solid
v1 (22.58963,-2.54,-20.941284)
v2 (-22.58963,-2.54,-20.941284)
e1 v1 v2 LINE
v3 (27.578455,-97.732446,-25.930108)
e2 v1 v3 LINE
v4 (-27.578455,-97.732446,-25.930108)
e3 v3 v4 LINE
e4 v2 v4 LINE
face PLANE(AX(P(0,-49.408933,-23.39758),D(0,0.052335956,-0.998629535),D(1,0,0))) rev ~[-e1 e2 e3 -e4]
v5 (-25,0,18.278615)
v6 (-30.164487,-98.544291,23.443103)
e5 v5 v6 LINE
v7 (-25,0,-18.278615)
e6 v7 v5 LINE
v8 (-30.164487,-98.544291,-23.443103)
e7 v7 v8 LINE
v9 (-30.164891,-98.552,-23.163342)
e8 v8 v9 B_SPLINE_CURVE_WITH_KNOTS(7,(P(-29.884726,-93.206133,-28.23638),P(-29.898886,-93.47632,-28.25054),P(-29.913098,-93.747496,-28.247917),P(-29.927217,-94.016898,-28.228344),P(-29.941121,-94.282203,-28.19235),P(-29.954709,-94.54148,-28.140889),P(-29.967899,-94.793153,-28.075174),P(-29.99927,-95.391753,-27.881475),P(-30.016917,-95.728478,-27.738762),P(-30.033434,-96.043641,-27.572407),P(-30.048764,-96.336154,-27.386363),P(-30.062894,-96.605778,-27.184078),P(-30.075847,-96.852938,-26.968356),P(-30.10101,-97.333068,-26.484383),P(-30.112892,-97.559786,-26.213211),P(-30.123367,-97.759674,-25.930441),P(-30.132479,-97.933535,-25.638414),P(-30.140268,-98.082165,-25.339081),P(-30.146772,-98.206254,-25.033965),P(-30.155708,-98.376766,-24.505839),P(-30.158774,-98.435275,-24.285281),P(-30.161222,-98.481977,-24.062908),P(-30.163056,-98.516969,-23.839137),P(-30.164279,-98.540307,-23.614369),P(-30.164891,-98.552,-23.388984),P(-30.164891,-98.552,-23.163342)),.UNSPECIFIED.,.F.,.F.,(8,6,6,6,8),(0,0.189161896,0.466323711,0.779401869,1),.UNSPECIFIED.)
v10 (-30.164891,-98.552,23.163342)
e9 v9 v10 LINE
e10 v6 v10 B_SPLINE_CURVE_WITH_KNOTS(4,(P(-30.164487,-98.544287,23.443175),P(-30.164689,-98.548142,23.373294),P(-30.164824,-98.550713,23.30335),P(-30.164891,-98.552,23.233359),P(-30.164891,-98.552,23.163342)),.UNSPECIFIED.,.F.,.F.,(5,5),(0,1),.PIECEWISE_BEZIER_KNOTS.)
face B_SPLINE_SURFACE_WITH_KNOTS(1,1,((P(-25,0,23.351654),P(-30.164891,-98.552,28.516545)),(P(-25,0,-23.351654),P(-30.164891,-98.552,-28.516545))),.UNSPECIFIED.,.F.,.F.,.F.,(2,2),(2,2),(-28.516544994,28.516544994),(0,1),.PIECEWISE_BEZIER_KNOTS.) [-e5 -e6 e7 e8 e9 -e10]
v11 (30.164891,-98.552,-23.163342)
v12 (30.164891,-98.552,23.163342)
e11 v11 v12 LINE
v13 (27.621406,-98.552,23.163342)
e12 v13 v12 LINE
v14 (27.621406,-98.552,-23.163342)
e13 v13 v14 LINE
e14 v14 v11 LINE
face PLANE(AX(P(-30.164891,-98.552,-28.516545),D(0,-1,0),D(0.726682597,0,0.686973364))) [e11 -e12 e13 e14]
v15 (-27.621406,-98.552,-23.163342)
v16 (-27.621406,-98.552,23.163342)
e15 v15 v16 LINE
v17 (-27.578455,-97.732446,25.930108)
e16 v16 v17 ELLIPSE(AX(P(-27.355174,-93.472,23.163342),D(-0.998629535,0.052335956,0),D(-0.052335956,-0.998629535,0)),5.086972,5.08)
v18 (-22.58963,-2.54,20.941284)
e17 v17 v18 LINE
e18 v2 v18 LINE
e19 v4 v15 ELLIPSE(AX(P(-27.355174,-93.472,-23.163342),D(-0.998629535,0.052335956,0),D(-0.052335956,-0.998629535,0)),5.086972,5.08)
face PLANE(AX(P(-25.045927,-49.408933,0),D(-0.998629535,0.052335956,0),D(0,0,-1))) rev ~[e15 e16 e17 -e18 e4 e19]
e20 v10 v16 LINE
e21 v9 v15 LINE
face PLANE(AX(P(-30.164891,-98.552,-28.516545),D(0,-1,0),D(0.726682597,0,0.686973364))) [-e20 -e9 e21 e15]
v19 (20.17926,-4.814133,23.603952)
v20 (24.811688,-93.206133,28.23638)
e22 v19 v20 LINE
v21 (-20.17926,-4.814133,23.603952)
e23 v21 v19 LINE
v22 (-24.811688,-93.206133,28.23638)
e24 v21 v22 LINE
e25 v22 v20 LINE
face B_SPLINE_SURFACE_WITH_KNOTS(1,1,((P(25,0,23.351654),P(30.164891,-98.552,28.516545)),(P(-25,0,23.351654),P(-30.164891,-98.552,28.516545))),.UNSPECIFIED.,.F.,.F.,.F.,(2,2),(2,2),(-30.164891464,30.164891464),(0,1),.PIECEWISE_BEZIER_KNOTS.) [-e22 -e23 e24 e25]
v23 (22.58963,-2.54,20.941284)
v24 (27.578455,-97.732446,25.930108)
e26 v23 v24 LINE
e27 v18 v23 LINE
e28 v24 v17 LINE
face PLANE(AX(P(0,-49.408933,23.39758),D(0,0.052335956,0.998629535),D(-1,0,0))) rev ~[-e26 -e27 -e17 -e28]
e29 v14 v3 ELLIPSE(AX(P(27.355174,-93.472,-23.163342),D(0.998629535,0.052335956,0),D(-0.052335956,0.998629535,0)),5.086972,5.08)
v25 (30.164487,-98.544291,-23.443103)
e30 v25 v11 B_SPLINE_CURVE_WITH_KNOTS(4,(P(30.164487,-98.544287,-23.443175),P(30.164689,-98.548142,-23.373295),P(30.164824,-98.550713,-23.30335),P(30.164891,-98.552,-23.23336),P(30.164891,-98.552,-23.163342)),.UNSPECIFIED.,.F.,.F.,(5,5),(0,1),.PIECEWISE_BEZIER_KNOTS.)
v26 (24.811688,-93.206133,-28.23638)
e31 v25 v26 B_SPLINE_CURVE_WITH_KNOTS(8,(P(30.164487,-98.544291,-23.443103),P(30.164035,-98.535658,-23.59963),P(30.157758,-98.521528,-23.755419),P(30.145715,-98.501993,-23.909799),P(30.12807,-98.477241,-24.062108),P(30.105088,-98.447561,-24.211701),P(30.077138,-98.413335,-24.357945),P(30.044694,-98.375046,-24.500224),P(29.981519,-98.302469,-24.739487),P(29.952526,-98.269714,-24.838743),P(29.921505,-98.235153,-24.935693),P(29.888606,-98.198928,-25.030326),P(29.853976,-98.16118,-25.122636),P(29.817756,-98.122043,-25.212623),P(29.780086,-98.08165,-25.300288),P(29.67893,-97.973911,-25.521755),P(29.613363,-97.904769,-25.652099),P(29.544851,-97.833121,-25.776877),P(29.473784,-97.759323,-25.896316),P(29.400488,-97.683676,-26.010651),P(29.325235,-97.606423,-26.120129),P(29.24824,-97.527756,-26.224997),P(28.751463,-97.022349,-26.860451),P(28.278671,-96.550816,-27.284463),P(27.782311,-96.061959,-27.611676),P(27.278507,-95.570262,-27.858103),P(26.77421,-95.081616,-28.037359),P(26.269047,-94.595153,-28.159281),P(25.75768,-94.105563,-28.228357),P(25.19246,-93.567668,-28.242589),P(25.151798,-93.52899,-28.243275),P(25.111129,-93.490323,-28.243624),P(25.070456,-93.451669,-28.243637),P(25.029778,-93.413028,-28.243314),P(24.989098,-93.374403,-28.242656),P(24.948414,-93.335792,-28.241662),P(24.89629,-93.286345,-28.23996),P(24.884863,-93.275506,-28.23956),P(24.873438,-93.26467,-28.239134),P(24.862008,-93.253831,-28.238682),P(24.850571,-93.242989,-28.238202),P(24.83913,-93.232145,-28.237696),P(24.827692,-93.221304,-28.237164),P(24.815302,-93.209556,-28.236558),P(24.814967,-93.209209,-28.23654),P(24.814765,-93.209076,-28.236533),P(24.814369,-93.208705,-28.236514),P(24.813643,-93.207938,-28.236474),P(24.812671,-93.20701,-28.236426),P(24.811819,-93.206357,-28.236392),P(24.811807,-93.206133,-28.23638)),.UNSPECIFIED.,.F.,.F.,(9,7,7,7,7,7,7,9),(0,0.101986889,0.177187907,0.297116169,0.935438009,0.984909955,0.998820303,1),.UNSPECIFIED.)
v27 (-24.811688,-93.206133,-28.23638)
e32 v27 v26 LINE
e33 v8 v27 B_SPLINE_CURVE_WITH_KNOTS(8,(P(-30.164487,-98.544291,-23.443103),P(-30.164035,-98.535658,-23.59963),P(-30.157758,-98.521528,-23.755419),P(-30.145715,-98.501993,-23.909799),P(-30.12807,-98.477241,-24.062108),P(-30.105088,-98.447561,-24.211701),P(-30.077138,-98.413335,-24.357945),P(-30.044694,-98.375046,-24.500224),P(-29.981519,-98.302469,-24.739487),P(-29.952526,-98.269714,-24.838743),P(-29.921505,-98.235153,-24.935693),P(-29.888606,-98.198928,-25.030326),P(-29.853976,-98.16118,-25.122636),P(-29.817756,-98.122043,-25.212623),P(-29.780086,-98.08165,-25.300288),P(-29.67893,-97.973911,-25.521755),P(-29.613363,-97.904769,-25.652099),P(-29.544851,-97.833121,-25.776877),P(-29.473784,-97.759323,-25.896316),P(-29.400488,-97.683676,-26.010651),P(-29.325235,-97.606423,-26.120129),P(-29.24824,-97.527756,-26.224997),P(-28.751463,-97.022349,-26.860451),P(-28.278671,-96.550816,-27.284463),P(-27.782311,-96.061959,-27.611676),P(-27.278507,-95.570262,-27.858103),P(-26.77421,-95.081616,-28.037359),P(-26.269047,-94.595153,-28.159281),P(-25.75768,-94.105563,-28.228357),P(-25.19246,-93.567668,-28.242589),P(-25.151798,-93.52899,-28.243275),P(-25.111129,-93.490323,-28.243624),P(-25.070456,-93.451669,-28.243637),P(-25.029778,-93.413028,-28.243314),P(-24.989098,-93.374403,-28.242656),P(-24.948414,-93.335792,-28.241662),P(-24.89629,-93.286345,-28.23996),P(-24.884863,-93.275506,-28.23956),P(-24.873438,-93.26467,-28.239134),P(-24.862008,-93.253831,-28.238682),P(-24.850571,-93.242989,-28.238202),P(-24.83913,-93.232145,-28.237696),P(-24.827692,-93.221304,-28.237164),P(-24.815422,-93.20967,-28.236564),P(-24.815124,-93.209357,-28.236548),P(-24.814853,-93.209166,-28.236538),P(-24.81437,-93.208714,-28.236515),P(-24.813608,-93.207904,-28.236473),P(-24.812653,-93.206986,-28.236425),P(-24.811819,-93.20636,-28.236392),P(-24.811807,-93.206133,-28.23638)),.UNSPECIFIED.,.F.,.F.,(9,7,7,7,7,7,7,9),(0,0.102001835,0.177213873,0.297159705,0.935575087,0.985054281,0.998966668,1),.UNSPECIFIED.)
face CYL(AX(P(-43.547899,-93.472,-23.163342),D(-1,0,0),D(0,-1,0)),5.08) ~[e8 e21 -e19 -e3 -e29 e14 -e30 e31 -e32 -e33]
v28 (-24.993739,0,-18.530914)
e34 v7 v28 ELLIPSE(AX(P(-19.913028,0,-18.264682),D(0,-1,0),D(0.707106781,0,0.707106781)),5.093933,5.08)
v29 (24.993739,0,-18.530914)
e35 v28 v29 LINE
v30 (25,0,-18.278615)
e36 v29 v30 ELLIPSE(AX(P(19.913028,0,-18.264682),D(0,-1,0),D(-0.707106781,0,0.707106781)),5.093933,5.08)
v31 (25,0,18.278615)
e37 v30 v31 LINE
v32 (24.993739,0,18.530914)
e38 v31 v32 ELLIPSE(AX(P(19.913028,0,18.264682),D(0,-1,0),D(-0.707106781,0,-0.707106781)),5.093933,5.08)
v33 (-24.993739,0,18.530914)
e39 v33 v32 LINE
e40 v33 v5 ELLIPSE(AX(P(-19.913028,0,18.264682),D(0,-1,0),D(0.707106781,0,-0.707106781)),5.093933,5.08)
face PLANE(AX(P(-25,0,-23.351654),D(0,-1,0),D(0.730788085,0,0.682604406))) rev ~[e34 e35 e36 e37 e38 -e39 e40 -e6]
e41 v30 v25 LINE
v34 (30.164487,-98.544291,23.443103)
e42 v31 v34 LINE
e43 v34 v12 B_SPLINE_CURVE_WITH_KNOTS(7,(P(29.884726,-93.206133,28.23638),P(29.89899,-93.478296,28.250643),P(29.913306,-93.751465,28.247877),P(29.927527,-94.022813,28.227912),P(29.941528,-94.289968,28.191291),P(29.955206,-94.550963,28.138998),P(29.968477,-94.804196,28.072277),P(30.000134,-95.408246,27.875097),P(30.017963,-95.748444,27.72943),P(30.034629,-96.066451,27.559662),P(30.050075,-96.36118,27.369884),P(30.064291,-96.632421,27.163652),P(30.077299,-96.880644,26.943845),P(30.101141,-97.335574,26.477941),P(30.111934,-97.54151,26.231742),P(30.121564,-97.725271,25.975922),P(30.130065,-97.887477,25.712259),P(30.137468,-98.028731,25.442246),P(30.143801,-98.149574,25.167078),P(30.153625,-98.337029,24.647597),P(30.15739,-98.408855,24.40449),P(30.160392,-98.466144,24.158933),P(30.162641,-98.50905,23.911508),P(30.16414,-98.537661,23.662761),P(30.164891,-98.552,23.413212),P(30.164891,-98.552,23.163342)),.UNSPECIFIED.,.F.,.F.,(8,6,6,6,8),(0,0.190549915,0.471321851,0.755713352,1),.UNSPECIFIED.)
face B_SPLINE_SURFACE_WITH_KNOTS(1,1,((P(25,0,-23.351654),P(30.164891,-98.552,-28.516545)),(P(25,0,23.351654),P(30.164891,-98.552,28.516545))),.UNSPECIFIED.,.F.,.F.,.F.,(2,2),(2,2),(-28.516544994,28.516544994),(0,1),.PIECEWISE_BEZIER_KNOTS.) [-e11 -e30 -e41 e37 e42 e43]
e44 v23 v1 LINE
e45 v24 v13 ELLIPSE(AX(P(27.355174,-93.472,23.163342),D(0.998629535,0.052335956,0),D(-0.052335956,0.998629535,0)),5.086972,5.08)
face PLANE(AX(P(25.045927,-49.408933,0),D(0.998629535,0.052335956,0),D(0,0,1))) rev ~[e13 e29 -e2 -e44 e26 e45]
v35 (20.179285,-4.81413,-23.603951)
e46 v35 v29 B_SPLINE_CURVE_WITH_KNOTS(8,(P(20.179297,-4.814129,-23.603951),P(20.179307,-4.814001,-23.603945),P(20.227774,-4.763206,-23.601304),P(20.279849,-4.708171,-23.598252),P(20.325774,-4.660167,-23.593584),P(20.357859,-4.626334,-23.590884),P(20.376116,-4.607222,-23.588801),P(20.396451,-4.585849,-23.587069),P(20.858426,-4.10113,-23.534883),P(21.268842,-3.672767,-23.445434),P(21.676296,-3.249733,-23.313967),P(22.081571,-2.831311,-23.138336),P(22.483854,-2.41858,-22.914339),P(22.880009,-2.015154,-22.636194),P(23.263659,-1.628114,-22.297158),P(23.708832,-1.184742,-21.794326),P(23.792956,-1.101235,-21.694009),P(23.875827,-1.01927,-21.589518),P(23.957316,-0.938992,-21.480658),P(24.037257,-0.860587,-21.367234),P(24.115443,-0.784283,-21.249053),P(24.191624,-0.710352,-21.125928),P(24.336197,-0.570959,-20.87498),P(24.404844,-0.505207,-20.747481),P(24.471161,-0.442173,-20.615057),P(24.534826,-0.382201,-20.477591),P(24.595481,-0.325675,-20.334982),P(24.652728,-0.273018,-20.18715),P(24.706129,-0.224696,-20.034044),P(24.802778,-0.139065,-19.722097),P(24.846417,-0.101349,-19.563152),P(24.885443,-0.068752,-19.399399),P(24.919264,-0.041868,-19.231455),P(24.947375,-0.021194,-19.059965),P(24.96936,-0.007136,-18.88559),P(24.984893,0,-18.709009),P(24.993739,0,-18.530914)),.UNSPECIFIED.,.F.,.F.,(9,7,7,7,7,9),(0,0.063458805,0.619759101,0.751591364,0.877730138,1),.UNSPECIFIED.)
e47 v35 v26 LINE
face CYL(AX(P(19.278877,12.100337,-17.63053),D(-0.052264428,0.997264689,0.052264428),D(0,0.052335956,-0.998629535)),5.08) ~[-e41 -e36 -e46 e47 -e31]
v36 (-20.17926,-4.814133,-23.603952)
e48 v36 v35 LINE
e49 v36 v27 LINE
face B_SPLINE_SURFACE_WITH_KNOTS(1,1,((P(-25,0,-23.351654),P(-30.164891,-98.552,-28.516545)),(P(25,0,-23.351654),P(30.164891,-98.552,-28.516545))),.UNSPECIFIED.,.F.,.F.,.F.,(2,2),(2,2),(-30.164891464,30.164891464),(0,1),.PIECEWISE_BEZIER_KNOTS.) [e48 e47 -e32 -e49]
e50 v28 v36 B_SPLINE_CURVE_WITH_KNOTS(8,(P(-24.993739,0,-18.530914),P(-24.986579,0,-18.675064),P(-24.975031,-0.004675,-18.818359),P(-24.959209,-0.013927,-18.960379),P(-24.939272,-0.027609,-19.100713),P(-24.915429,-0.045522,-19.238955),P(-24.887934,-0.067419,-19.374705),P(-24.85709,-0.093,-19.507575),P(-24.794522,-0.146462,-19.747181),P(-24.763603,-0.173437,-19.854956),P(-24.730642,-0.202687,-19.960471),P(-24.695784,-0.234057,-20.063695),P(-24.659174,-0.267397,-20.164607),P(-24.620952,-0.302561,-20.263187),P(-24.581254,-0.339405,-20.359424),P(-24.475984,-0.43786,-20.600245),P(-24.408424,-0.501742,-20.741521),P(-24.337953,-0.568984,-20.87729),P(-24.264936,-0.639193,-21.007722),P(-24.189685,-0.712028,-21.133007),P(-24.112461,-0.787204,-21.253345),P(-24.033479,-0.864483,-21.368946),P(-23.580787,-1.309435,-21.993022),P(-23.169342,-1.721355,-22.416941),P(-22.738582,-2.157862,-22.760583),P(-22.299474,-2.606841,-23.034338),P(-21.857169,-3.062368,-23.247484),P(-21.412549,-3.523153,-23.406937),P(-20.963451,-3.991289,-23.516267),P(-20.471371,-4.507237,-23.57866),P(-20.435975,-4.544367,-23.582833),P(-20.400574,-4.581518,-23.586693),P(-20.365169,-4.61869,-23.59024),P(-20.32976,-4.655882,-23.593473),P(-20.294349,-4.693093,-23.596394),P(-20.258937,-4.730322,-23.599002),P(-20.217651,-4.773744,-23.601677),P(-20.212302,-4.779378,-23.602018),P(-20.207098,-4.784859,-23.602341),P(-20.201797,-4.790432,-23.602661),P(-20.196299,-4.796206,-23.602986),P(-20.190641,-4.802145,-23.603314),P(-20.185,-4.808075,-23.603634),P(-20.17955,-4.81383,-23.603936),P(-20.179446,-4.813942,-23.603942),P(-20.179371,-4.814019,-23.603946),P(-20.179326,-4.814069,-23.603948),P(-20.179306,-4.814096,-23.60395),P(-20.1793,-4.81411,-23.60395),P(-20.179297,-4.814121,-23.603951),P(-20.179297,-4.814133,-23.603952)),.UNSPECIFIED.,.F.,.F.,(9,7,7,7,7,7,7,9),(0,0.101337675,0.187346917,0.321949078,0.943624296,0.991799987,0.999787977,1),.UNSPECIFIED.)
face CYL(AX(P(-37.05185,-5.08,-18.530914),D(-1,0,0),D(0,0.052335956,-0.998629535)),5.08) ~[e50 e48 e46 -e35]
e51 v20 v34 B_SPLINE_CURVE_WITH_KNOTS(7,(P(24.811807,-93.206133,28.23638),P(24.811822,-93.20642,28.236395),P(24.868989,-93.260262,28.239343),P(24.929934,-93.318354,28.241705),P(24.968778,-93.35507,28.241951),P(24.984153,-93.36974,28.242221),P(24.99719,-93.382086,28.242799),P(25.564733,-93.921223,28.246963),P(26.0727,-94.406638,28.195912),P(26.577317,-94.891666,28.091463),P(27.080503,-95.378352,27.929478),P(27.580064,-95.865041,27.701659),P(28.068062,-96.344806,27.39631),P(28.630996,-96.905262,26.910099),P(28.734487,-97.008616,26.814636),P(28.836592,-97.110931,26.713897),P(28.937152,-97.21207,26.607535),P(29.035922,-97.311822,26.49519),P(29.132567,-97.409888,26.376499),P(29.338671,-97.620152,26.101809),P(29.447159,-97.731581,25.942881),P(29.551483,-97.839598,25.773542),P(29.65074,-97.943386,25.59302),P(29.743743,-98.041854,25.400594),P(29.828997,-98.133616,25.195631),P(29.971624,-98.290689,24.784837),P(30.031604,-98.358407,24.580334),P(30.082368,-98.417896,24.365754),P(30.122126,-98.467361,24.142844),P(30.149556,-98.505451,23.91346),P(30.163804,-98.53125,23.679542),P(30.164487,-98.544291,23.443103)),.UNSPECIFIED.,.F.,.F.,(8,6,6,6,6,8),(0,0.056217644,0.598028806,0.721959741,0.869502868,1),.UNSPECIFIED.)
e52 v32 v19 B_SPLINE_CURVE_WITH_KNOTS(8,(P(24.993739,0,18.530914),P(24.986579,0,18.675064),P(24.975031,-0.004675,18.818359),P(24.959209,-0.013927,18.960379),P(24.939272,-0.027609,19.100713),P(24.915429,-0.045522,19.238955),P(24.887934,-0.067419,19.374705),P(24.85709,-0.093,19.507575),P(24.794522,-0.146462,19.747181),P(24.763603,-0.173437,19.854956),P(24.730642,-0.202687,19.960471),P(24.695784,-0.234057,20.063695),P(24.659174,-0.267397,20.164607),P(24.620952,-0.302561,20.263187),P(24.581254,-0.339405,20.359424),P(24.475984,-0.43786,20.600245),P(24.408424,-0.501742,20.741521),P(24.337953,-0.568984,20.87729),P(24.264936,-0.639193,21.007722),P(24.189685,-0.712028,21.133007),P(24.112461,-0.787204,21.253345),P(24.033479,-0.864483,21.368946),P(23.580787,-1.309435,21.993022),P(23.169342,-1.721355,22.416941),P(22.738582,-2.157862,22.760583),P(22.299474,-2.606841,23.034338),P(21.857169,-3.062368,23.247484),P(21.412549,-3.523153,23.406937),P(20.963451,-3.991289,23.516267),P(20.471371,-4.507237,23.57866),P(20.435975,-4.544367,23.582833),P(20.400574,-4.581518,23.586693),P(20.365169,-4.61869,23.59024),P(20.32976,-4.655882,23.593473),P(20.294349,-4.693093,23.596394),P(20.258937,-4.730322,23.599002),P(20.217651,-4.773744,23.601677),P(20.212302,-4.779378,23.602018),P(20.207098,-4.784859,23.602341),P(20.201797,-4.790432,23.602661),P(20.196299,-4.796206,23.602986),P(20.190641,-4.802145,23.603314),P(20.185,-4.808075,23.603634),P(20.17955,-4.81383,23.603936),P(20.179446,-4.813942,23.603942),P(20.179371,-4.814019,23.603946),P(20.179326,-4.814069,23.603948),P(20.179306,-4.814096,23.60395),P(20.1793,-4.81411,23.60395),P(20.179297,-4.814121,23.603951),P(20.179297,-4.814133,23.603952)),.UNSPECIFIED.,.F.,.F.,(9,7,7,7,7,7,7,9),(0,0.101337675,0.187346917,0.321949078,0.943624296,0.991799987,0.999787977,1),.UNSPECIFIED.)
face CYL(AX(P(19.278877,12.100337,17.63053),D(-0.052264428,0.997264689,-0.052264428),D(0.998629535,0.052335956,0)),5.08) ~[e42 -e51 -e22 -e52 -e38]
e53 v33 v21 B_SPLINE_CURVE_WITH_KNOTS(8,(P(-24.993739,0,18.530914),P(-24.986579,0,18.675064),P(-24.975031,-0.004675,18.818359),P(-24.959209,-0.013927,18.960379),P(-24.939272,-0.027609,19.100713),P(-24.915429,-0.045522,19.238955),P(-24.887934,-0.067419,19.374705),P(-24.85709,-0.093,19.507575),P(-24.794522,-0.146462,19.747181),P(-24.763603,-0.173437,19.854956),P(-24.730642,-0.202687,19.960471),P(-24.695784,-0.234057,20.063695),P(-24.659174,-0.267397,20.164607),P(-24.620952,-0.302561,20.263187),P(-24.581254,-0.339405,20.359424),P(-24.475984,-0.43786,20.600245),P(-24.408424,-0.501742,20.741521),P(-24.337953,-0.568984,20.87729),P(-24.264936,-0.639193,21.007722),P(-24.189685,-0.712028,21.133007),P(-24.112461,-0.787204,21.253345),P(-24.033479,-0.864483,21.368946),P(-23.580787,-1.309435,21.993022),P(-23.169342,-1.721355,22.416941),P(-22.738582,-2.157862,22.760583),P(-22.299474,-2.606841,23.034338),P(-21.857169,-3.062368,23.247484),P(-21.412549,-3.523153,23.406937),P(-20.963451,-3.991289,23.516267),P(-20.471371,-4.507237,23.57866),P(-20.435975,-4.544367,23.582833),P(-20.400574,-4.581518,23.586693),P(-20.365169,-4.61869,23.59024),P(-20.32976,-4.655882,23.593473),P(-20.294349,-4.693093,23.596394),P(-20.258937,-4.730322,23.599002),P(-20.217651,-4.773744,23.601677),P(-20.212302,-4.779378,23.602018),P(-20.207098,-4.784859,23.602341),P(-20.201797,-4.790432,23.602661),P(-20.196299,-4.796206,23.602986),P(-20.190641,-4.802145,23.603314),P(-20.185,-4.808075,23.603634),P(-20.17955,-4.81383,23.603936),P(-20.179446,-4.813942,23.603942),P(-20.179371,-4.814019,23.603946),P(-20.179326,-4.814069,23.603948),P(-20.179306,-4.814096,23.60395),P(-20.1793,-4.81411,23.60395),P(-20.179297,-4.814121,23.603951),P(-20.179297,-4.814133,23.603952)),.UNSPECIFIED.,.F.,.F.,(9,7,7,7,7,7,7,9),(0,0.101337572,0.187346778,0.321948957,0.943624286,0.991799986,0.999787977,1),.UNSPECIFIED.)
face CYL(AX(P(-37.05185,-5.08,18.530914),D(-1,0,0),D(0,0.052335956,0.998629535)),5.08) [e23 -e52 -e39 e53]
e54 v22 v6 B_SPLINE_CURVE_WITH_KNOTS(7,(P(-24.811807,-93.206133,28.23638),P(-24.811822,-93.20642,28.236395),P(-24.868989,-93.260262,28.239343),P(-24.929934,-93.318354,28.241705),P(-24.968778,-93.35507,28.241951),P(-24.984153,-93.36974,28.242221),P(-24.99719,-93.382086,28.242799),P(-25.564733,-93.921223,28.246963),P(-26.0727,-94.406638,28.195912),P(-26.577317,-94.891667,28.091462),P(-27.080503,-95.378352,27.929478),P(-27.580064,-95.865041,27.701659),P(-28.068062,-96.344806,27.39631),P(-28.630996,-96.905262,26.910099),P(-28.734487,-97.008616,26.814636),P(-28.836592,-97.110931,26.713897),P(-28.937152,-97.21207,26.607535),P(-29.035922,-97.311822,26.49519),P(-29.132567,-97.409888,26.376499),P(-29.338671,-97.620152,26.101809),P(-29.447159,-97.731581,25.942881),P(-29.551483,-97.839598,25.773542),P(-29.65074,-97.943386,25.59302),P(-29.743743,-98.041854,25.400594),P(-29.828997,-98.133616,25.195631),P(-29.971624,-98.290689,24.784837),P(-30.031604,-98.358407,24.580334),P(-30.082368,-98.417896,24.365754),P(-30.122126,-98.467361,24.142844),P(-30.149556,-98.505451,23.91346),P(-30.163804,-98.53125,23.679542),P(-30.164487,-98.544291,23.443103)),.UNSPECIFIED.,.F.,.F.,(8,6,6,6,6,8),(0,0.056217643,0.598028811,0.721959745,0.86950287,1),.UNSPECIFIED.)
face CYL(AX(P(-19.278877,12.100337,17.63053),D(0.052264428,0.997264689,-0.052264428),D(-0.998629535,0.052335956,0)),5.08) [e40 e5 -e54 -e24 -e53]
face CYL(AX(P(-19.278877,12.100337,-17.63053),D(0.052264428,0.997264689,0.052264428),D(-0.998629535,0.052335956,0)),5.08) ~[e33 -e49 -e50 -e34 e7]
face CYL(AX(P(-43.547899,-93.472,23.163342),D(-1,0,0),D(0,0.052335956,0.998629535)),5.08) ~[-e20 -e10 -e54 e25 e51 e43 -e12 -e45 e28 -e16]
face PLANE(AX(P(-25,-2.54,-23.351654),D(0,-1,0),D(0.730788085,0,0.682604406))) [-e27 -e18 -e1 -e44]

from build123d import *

# Parameters (mm, degrees)
F0_W        = 50
F0_H        = 46.7033070608
F1_DEPTH    = 98.552
F1_TAPER    = -3
F2_T        = -2.54
F3_T1_DEPTH = 74.1036999946
F3_T3_DEPTH = 124.1528328785
F3_T5_DEPTH = 87.0957981099
F3_T7_DEPTH = 124.1528328785
F4_T1_DEPTH = 74.1036999946
F4_T3_DEPTH = 124.1528328785
F4_T5_DEPTH = 87.0957981099
F4_T7_DEPTH = 124.1528328785


# Not quite as in the source:
# - a fillet or chamfer that OpenCascade refuses, or shapes differently, is made with other operations: its cross-section is extruded or revolved along the edge and cut away or added


with BuildPart() as f1:
    # F0 (on Front) → F1 (new body)
    with BuildSketch(Plane.XZ):
        Rectangle(F0_W, F0_H)
    extrude(amount=F1_DEPTH, taper=F1_TAPER)

    # F2
    f2_openings = [f1.faces().sort_by_distance(p)[0] for p in [
        (0, -98.552, 0),
    ]]
    offset(amount=F2_T, openings=f2_openings)

    # F3: fillet of radius 5.08 on 4 edges, made by hand

    # F3_s2 → F3_t1 (cut)
    with BuildSketch(Plane.YZ.offset(-37.0518499973)):
        with BuildLine():
            ThreePointArc((-4.8141333423, 23.6039515681), (-1.3950981953, 22.027754776), (0, 18.5309135315))
            Line((0, 18.5309135315), (0, 23.3516535304))
            Line((0, 23.3516535304), (-4.8141333423, 23.6039515681))
        make_face()
    extrude(amount=F3_T1_DEPTH, mode=Mode.SUBTRACT)

    # F3_s4 → F3_t3 (cut)
    with BuildSketch(Plane(origin=(0.5298667006, 10.1104589396, -0.5298667006), x_dir=(0.9986295348, -0.0523359562, 0), z_dir=(-0.0522644277, -0.9972646886, 0.0522644277))):
        with BuildLine():
            ThreePointArc((-24.9657383689, 18.1852510398), (-23.4827569315, 21.7724306367), (-19.8996527546, 23.2652319837))
            Line((-19.8996527546, 23.2652319837), (-24.9657383689, 23.2513556581))
            Line((-24.9657383689, 23.2513556581), (-24.9657383689, 18.1852510398))
        make_face()
    extrude(amount=F3_T3_DEPTH, mode=Mode.SUBTRACT)

    # F3_s6 → F3_t5 (cut)
    with BuildSketch(Plane.YZ.offset(-43.547899055)):
        with BuildLine():
            ThreePointArc((-93.2061333423, 28.2363799944), (-96.9688412445, 26.8482437626), (-98.552, 23.1633419579))
            Line((-98.552, 23.1633419579), (-98.552, 28.5165449943))
            Line((-98.552, 28.5165449943), (-93.2061333423, 28.2363799944))
        make_face()
    extrude(amount=F3_T5_DEPTH, mode=Mode.SUBTRACT)

    # F3_s8 → F3_t7 (cut)
    with BuildSketch(Plane(origin=(-0.5298667006, 10.1104589396, -0.5298667006), x_dir=(0.9986295348, 0.0523359562, 0), z_dir=(0.0522644277, -0.9972646886, 0.0522644277))):
        with BuildLine():
            ThreePointArc((24.9657383689, 18.1852510398), (23.4827569315, 21.7724306367), (19.8996527546, 23.2652319837))
            Line((19.8996527546, 23.2652319837), (24.9657383689, 23.2513556581))
            Line((24.9657383689, 23.2513556581), (24.9657383689, 18.1852510398))
        make_face()
    extrude(amount=F3_T7_DEPTH, mode=Mode.SUBTRACT)

    # F4: fillet of radius 5.08 on 4 edges, made by hand

    # F4_s2 → F4_t1 (cut)
    with BuildSketch(Plane.YZ.offset(-37.0518499973)):
        with BuildLine():
            ThreePointArc((-4.8141333423, -23.6039515681), (-1.3950981953, -22.027754776), (0, -18.5309135315))
            Line((0, -18.5309135315), (0, -23.3516535304))
            Line((0, -23.3516535304), (-4.8141333423, -23.6039515681))
        make_face()
    extrude(amount=F4_T1_DEPTH, mode=Mode.SUBTRACT)

    # F4_s4 → F4_t3 (cut)
    with BuildSketch(Plane(origin=(-0.5298667006, 10.1104589396, 0.5298667006), x_dir=(0.9986295348, 0.0523359562, 0), z_dir=(0.0522644277, -0.9972646886, -0.0522644277))):
        with BuildLine():
            ThreePointArc((19.8996527546, -23.2652319837), (23.4827569315, -21.7724306367), (24.9657383689, -18.1852510398))
            Line((24.9657383689, -18.1852510398), (24.9657383689, -23.2513556581))
            Line((24.9657383689, -23.2513556581), (19.8996527546, -23.2652319837))
        make_face()
    extrude(amount=F4_T3_DEPTH, mode=Mode.SUBTRACT)

    # F4_s6 → F4_t5 (cut)
    with BuildSketch(Plane.YZ.offset(-43.547899055)):
        with BuildLine():
            ThreePointArc((-98.552, -23.1633419579), (-96.9688412445, -26.8482437626), (-93.2061333423, -28.2363799944))
            Line((-93.2061333423, -28.2363799944), (-98.552, -28.5165449943))
            Line((-98.552, -28.5165449943), (-98.552, -23.1633419579))
        make_face()
    extrude(amount=F4_T5_DEPTH, mode=Mode.SUBTRACT)

    # F4_s8 → F4_t7 (cut)
    with BuildSketch(Plane(origin=(0.5298667006, 10.1104589396, 0.5298667006), x_dir=(0.9986295348, -0.0523359562, 0), z_dir=(-0.0522644277, -0.9972646886, -0.0522644277))):
        with BuildLine():
            ThreePointArc((-24.9657383689, -18.1852510398), (-23.4827569315, -21.7724306367), (-19.8996527546, -23.2652319837))
            Line((-19.8996527546, -23.2652319837), (-24.9657383689, -23.2513556581))
            Line((-24.9657383689, -23.2513556581), (-24.9657383689, -18.1852510398))
        make_face()
    extrude(amount=F4_T7_DEPTH, mode=Mode.SUBTRACT)


solid = f1.part
